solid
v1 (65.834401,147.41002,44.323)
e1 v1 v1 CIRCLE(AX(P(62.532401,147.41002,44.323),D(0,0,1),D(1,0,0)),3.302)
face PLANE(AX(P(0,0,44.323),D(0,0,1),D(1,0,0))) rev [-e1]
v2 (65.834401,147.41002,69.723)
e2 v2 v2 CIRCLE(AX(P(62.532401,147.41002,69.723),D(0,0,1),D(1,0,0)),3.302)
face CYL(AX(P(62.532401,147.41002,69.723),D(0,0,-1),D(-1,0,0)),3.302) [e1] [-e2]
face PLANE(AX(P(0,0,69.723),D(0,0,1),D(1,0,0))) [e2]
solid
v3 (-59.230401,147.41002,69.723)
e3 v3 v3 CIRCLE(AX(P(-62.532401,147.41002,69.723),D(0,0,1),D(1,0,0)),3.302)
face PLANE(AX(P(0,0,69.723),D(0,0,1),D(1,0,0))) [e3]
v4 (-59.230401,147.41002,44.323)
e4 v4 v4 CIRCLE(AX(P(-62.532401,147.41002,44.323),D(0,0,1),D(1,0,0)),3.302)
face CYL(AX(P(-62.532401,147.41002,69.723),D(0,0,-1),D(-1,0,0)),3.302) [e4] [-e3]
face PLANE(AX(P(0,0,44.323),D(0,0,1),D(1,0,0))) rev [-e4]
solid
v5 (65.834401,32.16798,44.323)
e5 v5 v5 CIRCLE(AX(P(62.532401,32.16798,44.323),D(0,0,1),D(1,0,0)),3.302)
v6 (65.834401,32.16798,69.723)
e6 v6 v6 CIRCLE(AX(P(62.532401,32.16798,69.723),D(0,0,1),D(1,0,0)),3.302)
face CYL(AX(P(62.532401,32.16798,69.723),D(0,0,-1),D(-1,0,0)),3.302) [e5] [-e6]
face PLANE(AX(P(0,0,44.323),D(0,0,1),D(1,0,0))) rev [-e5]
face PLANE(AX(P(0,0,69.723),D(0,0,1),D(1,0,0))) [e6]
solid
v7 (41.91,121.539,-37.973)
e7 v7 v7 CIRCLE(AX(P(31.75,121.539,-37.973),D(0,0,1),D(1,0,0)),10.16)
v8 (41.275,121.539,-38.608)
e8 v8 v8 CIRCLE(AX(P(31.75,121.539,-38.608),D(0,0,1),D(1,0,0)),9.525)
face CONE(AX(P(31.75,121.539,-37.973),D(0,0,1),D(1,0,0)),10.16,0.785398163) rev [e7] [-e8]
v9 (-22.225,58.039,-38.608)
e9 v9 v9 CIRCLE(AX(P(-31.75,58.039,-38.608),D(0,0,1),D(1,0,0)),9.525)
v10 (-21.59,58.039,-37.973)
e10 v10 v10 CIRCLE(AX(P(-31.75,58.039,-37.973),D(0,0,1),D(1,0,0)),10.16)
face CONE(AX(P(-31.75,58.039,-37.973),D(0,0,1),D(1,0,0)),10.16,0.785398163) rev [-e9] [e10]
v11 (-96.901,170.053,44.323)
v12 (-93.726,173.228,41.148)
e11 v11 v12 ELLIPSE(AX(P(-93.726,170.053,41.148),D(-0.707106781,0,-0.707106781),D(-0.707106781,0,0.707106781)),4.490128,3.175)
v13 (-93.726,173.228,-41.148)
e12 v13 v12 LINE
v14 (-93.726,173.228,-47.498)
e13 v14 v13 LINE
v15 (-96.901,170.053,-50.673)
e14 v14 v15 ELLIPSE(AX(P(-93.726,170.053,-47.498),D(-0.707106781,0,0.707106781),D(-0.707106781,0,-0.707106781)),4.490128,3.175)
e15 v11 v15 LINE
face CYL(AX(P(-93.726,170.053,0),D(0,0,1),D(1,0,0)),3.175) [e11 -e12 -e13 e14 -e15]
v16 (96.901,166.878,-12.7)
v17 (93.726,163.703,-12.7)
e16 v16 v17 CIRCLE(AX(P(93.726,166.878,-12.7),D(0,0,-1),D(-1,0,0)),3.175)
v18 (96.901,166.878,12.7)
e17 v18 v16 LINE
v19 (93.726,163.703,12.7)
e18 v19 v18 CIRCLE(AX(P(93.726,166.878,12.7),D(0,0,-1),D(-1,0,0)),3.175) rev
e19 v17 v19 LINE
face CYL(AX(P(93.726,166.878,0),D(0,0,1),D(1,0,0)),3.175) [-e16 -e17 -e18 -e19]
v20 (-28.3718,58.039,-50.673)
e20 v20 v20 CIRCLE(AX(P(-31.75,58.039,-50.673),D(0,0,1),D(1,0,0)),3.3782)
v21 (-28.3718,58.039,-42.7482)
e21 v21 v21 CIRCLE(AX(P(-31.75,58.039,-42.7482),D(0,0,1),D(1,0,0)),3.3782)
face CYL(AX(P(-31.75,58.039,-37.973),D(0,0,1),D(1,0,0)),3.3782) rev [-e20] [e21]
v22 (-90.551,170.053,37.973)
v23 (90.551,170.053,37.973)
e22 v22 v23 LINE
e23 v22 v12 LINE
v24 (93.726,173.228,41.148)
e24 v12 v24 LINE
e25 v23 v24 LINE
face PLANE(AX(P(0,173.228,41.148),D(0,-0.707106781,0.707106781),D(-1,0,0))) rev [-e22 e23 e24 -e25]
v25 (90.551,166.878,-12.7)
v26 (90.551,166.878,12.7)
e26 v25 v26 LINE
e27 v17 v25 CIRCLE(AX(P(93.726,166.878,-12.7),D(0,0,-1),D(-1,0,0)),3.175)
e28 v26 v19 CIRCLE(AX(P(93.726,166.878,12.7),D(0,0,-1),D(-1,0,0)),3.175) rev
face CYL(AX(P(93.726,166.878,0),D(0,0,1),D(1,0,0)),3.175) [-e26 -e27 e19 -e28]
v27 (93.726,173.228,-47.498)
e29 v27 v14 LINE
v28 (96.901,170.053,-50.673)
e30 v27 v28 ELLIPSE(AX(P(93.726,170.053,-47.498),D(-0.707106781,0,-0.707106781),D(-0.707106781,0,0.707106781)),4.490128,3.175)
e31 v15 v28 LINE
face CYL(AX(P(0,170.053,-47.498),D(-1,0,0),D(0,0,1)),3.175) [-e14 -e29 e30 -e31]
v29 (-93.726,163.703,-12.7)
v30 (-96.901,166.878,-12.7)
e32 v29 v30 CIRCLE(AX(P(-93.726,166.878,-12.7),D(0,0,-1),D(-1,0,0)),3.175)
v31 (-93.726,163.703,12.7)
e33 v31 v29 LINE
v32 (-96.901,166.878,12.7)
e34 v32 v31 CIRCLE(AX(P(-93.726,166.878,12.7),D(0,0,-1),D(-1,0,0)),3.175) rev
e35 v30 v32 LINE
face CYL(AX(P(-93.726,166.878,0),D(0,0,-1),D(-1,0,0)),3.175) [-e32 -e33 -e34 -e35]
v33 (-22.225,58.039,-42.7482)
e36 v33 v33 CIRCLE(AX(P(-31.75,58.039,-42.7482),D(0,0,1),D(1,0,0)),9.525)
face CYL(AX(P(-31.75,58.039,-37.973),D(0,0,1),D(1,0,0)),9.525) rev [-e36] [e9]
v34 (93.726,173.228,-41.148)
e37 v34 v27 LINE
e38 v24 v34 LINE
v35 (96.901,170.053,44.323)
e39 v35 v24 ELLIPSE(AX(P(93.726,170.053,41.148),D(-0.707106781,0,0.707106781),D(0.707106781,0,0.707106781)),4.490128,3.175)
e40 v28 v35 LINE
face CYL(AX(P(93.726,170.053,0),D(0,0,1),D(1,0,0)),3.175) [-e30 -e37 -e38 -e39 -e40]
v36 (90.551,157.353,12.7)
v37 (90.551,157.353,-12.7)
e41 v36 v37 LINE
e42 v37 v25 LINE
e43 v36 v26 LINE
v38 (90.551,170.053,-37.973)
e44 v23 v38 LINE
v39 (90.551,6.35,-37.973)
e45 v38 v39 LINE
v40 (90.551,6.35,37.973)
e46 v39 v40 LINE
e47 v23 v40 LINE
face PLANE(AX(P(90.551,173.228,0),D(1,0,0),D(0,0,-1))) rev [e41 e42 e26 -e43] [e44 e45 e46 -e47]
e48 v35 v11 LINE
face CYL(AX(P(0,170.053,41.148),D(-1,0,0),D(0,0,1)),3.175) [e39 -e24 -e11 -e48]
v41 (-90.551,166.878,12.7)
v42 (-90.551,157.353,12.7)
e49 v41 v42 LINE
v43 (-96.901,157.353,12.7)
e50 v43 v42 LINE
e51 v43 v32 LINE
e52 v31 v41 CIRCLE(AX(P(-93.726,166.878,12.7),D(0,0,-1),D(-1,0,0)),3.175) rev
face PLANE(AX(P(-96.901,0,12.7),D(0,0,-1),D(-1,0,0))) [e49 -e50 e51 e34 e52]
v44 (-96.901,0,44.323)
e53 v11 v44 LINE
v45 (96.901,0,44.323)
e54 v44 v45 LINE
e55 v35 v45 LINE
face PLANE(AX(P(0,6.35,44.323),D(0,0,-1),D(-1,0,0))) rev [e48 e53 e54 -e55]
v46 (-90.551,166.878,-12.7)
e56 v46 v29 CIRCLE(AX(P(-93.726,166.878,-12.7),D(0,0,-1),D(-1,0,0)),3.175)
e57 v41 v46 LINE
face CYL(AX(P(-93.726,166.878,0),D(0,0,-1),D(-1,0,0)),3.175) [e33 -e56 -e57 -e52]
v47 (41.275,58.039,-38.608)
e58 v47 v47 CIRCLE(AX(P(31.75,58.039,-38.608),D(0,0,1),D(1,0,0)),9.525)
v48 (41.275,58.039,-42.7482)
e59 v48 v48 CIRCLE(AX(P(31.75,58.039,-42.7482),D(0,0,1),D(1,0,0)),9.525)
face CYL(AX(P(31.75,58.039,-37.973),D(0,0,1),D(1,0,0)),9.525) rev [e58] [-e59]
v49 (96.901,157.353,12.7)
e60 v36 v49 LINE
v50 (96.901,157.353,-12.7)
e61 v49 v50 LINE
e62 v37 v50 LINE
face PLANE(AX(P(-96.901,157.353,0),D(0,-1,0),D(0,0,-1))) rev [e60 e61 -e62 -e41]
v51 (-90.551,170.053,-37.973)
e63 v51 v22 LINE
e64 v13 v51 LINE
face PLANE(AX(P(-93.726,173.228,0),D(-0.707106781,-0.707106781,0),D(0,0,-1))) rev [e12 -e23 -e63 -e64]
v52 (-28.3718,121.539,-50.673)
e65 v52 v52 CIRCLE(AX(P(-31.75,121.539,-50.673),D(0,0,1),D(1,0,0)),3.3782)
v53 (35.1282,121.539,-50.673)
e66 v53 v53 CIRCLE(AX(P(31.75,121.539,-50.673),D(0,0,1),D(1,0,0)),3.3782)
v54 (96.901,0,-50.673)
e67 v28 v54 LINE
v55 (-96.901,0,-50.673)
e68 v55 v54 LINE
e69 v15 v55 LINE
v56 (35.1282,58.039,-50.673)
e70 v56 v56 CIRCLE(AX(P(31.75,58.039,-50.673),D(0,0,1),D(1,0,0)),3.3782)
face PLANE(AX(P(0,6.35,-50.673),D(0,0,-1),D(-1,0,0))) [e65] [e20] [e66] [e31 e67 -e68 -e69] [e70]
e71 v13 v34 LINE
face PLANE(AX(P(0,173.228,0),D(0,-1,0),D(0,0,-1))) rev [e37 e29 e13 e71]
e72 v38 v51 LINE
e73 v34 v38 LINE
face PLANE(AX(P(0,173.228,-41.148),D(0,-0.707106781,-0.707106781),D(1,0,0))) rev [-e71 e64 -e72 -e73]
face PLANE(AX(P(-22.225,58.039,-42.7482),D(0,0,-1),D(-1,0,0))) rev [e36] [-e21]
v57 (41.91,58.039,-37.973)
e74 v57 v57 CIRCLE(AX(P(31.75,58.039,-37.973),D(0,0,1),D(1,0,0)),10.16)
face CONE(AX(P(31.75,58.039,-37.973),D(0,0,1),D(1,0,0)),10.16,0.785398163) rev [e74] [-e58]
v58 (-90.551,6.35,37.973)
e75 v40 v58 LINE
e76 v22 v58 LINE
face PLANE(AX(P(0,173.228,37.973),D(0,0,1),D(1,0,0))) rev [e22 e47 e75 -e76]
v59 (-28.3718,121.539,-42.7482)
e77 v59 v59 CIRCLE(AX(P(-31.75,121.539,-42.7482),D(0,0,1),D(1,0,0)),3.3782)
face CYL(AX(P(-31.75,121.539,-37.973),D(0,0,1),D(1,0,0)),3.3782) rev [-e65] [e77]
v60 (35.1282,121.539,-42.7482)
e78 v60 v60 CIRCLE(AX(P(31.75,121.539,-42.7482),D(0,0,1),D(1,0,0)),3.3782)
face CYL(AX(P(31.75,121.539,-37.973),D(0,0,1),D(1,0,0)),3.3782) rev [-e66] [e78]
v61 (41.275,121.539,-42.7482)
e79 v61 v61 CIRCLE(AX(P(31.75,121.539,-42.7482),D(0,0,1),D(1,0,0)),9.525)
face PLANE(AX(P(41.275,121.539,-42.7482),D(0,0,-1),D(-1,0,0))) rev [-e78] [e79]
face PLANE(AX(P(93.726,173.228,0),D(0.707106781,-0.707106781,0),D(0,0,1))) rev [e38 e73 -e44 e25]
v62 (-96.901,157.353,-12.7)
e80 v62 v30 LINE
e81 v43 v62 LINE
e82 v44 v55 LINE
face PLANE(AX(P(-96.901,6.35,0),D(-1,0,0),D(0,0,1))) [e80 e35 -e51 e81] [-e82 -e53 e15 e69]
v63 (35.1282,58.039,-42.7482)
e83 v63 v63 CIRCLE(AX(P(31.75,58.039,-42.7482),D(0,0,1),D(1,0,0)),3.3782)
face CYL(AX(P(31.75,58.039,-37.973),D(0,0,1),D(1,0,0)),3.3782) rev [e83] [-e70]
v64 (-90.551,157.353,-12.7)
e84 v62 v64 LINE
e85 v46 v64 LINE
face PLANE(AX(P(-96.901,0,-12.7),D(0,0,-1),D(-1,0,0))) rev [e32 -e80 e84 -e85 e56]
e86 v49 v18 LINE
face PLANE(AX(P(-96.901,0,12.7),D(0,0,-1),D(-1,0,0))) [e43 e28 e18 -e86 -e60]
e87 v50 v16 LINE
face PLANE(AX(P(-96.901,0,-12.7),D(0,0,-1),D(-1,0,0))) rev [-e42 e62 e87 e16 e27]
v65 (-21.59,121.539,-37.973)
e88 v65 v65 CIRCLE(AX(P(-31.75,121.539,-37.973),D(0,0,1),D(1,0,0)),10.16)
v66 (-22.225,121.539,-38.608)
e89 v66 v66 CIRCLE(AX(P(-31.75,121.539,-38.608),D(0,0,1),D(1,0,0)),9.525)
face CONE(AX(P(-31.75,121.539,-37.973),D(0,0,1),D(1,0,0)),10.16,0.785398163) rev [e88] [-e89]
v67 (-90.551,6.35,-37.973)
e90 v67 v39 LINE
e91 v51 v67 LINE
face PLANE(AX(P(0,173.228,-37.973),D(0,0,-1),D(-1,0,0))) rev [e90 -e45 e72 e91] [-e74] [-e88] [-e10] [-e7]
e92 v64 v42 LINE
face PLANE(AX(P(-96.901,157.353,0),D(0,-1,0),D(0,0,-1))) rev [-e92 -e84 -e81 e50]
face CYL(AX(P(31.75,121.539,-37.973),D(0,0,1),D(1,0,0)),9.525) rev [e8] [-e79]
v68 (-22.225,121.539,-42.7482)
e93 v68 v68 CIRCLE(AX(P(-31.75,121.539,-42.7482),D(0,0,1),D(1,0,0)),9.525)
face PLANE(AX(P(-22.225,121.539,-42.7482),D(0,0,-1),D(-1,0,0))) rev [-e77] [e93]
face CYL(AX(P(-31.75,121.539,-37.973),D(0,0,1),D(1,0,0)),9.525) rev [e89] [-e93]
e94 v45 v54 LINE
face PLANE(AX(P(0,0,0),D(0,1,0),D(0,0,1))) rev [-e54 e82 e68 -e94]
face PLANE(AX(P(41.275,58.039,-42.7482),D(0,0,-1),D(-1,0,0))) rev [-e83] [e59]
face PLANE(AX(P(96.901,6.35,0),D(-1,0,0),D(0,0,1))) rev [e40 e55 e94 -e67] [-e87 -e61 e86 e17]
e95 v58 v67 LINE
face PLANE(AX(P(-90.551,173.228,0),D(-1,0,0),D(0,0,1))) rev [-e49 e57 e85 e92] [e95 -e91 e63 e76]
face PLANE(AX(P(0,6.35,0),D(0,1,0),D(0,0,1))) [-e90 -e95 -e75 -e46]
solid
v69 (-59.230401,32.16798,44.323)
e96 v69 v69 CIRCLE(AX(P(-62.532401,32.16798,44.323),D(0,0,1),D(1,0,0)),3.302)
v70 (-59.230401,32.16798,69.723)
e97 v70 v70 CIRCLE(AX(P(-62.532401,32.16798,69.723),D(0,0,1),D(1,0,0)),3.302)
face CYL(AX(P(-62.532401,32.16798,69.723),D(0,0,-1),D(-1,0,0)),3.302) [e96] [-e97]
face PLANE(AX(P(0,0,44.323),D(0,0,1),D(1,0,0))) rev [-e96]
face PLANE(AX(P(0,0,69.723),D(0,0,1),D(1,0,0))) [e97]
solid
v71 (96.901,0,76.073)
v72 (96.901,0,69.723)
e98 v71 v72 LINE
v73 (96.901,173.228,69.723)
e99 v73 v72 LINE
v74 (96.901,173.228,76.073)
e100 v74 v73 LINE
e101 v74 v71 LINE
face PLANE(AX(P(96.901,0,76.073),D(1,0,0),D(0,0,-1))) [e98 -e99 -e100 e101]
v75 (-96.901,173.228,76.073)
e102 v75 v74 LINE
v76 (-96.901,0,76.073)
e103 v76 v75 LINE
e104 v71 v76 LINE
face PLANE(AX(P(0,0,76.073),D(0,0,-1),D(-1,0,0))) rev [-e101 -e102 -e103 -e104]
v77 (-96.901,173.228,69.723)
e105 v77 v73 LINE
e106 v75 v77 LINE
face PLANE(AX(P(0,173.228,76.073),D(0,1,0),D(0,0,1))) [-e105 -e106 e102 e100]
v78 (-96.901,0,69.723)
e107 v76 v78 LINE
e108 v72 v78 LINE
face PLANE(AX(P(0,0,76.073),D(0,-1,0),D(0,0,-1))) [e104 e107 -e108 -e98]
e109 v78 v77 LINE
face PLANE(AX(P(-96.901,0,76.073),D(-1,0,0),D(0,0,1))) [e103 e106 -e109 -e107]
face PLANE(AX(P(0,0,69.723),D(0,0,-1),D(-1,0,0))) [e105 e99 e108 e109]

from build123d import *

# Parameters (mm, degrees)
SKETCH2_W                               = 193.802
SKETCH2_H                               = 94.996
BOSS_EXTRUDE1_DEPTH                     = 6.35
BOSS_EXTRUDE2_START                     = 6.35
SKETCH2_3_W                             = 193.802
SKETCH2_3_H                             = 94.996
SKETCH2_3_W_2                           = 181.102
SKETCH2_3_H_2                           = 75.946
BOSS_EXTRUDE2_DEPTH                     = 166.878
CBORE_FOR_1_4_HEX_HEAD_BOLT2_AT_2_COUNT = 2
CBORE_FOR_1_4_HEX_HEAD_BOLT2_AT_2_PITCH = 63.5
CBORE_FOR_1_4_HEX_HEAD_BOLT2_AT_3_COUNT = 2
CBORE_FOR_1_4_HEX_HEAD_BOLT2_AT_3_PITCH = 89.802561211
CBORE_FOR_1_4_HEX_HEAD_BOLT2_AT_4_COUNT = 2
CBORE_FOR_1_4_HEX_HEAD_BOLT2_AT_4_PITCH = 63.5
SKETCH12_R                              = 3.302
BOSS_EXTRUDE3_DEPTH                     = 25.4
BOSS_EXTRUDE3_2_DEPTH                   = 25.4
BOSS_EXTRUDE3_3_DEPTH                   = 25.4
BOSS_EXTRUDE3_4_DEPTH                   = 25.4
BOSS_EXTRUDE4_START                     = 25.4
SKETCH13_W                              = 193.802
SKETCH13_H                              = 173.228
BOSS_EXTRUDE4_DEPTH                     = 6.35
SKETCH16_W                              = 25.4
SKETCH16_H                              = 6.35
CUT_EXTRUDE2_DEPTH                      = 271.839909387
FILLET1_R                               = 3.175
FILLET2_R                               = 3.175
CHAMFER1_SIZE                           = 3.175


with BuildPart() as part:
    # Sketch2 → Boss-Extrude1 (new body)
    with BuildSketch(Plane(origin=(0, 0, 0), x_dir=(1, 0, 0), z_dir=(0, 1, 0))):
        with Locations((0, 3.175)):
            Rectangle(SKETCH2_W, SKETCH2_H)
    extrude(amount=BOSS_EXTRUDE1_DEPTH)

    # Sketch2<3> → Boss-Extrude2 (add)
    with BuildSketch(Plane(origin=(0, 0, 0), x_dir=(1, 0, 0), z_dir=(0, 1, 0)).offset(BOSS_EXTRUDE2_START)):
        with Locations((0, 3.175)):
            Rectangle(SKETCH2_3_W, SKETCH2_3_H)
        Rectangle(SKETCH2_3_W_2, SKETCH2_3_H_2, mode=Mode.SUBTRACT)
    extrude(amount=BOSS_EXTRUDE2_DEPTH)

    # Sketch8 → CBORE for 1/4 Hex Head Bolt2 (revolve, cut)
    with BuildSketch(Plane(origin=(-31.75, 121.539, -37.973), x_dir=(0, -1, 0), z_dir=(1, 0, 0))):
        Polygon((0, 0), (0, 12.7), (3.3782, 12.7), (3.3782, 4.7752), (9.525, 4.7752), (9.525, 0.635), (10.16, 0), align=None)
    cbore_for_1_4_hex_head_bolt2 = revolve(axis=Axis((-31.75, 121.539, -31.623), (0, 0, -1)), mode=Mode.SUBTRACT)

    # CBORE for 1/4 Hex Head Bolt2 at 2: CBORE for 1/4 Hex Head Bolt2 ×2
    with Locations(*[(i * CBORE_FOR_1_4_HEX_HEAD_BOLT2_AT_2_PITCH, 0, 0) for i in range(1, CBORE_FOR_1_4_HEX_HEAD_BOLT2_AT_2_COUNT)]):
        add(cbore_for_1_4_hex_head_bolt2, mode=Mode.SUBTRACT)

    # CBORE for 1/4 Hex Head Bolt2 at 3: CBORE for 1/4 Hex Head Bolt2 ×2
    with Locations(*[Vector(0.7071067811865476, -0.7071067811865475, 0) * (i * CBORE_FOR_1_4_HEX_HEAD_BOLT2_AT_3_PITCH) for i in range(1, CBORE_FOR_1_4_HEX_HEAD_BOLT2_AT_3_COUNT)]):
        add(cbore_for_1_4_hex_head_bolt2, mode=Mode.SUBTRACT)

    # CBORE for 1/4 Hex Head Bolt2 at 4: CBORE for 1/4 Hex Head Bolt2 ×2
    with Locations(*[(0, -i * CBORE_FOR_1_4_HEX_HEAD_BOLT2_AT_4_PITCH, 0) for i in range(1, CBORE_FOR_1_4_HEX_HEAD_BOLT2_AT_4_COUNT)]):
        add(cbore_for_1_4_hex_head_bolt2, mode=Mode.SUBTRACT)

    # Sketch16 → Cut-Extrude2 (cut, through all)
    with BuildSketch(Plane(origin=(96.901, 0, 0), x_dir=(0, 0, -1), z_dir=(1, 0, 0))):
        with Locations((0, 160.528)):
            Rectangle(SKETCH16_W, SKETCH16_H)
    extrude(amount=-CUT_EXTRUDE2_DEPTH, mode=Mode.SUBTRACT)

    # Fillet1
    fillet1_edges = [part.edges().sort_by_distance(p)[0] for p in [
        (90.551, 163.703, 0),
        (96.901, 163.703, 0),
        (-90.551, 163.703, 0),
        (-96.901, 163.703, 0),
    ]]
    fillet(fillet1_edges, radius=FILLET1_R - 0.0001)  # a hair under: the kernel refuses the full size

    # Fillet2
    fillet2_edges = [part.edges().sort_by_distance(p)[0] for p in [
        (0, 173.228, -50.673),
        (-96.901, 173.228, -3.175),
        (0, 173.228, 44.323),
        (96.901, 173.228, -3.175),
    ]]
    fillet(fillet2_edges, radius=FILLET2_R)

    # Chamfer1
    chamfer1_edges = [part.edges().sort_by_distance(p)[0] for p in [
        (-90.551, 173.228, 0),
        (0, 173.228, -37.973),
        (90.551, 173.228, 0),
        (0, 173.228, 37.973),
    ]]
    chamfer(chamfer1_edges, length=CHAMFER1_SIZE - 0.0001)  # a hair under: the kernel refuses the full size


with BuildPart() as body_2:
    # Sketch12 → Boss-Extrude3 (new body)
    with BuildSketch(Plane.XY.offset(44.323)):
        with Locations((-62.532400681, 147.410019982)):
            Circle(SKETCH12_R)
    extrude(amount=BOSS_EXTRUDE3_DEPTH)


with BuildPart() as body_3:
    # Sketch12 → Boss-Extrude3 2 (new body)
    with BuildSketch(Plane.XY.offset(44.323)):
        with Locations((62.532400681, 147.410019982)):
            Circle(SKETCH12_R)
    extrude(amount=BOSS_EXTRUDE3_2_DEPTH)


with BuildPart() as body_4:
    # Sketch12 → Boss-Extrude3 3 (new body)
    with BuildSketch(Plane.XY.offset(44.323)):
        with Locations((62.532400681, 32.167980018)):
            Circle(SKETCH12_R)
    extrude(amount=BOSS_EXTRUDE3_3_DEPTH)


with BuildPart() as body_5:
    # Sketch12 → Boss-Extrude3 4 (new body)
    with BuildSketch(Plane.XY.offset(44.323)):
        with Locations((-62.532400681, 32.167980018)):
            Circle(SKETCH12_R)
    extrude(amount=BOSS_EXTRUDE3_4_DEPTH)


with BuildPart() as body_6:
    # Sketch13 → Boss-Extrude4 (new body)
    with BuildSketch(Plane.XY.offset(44.323).offset(BOSS_EXTRUDE4_START)):
        with Locations((0, 86.614)):
            Rectangle(SKETCH13_W, SKETCH13_H)
    extrude(amount=BOSS_EXTRUDE4_DEPTH)


solid = Compound([part.part, body_2.part, body_3.part, body_4.part, body_5.part, body_6.part])
